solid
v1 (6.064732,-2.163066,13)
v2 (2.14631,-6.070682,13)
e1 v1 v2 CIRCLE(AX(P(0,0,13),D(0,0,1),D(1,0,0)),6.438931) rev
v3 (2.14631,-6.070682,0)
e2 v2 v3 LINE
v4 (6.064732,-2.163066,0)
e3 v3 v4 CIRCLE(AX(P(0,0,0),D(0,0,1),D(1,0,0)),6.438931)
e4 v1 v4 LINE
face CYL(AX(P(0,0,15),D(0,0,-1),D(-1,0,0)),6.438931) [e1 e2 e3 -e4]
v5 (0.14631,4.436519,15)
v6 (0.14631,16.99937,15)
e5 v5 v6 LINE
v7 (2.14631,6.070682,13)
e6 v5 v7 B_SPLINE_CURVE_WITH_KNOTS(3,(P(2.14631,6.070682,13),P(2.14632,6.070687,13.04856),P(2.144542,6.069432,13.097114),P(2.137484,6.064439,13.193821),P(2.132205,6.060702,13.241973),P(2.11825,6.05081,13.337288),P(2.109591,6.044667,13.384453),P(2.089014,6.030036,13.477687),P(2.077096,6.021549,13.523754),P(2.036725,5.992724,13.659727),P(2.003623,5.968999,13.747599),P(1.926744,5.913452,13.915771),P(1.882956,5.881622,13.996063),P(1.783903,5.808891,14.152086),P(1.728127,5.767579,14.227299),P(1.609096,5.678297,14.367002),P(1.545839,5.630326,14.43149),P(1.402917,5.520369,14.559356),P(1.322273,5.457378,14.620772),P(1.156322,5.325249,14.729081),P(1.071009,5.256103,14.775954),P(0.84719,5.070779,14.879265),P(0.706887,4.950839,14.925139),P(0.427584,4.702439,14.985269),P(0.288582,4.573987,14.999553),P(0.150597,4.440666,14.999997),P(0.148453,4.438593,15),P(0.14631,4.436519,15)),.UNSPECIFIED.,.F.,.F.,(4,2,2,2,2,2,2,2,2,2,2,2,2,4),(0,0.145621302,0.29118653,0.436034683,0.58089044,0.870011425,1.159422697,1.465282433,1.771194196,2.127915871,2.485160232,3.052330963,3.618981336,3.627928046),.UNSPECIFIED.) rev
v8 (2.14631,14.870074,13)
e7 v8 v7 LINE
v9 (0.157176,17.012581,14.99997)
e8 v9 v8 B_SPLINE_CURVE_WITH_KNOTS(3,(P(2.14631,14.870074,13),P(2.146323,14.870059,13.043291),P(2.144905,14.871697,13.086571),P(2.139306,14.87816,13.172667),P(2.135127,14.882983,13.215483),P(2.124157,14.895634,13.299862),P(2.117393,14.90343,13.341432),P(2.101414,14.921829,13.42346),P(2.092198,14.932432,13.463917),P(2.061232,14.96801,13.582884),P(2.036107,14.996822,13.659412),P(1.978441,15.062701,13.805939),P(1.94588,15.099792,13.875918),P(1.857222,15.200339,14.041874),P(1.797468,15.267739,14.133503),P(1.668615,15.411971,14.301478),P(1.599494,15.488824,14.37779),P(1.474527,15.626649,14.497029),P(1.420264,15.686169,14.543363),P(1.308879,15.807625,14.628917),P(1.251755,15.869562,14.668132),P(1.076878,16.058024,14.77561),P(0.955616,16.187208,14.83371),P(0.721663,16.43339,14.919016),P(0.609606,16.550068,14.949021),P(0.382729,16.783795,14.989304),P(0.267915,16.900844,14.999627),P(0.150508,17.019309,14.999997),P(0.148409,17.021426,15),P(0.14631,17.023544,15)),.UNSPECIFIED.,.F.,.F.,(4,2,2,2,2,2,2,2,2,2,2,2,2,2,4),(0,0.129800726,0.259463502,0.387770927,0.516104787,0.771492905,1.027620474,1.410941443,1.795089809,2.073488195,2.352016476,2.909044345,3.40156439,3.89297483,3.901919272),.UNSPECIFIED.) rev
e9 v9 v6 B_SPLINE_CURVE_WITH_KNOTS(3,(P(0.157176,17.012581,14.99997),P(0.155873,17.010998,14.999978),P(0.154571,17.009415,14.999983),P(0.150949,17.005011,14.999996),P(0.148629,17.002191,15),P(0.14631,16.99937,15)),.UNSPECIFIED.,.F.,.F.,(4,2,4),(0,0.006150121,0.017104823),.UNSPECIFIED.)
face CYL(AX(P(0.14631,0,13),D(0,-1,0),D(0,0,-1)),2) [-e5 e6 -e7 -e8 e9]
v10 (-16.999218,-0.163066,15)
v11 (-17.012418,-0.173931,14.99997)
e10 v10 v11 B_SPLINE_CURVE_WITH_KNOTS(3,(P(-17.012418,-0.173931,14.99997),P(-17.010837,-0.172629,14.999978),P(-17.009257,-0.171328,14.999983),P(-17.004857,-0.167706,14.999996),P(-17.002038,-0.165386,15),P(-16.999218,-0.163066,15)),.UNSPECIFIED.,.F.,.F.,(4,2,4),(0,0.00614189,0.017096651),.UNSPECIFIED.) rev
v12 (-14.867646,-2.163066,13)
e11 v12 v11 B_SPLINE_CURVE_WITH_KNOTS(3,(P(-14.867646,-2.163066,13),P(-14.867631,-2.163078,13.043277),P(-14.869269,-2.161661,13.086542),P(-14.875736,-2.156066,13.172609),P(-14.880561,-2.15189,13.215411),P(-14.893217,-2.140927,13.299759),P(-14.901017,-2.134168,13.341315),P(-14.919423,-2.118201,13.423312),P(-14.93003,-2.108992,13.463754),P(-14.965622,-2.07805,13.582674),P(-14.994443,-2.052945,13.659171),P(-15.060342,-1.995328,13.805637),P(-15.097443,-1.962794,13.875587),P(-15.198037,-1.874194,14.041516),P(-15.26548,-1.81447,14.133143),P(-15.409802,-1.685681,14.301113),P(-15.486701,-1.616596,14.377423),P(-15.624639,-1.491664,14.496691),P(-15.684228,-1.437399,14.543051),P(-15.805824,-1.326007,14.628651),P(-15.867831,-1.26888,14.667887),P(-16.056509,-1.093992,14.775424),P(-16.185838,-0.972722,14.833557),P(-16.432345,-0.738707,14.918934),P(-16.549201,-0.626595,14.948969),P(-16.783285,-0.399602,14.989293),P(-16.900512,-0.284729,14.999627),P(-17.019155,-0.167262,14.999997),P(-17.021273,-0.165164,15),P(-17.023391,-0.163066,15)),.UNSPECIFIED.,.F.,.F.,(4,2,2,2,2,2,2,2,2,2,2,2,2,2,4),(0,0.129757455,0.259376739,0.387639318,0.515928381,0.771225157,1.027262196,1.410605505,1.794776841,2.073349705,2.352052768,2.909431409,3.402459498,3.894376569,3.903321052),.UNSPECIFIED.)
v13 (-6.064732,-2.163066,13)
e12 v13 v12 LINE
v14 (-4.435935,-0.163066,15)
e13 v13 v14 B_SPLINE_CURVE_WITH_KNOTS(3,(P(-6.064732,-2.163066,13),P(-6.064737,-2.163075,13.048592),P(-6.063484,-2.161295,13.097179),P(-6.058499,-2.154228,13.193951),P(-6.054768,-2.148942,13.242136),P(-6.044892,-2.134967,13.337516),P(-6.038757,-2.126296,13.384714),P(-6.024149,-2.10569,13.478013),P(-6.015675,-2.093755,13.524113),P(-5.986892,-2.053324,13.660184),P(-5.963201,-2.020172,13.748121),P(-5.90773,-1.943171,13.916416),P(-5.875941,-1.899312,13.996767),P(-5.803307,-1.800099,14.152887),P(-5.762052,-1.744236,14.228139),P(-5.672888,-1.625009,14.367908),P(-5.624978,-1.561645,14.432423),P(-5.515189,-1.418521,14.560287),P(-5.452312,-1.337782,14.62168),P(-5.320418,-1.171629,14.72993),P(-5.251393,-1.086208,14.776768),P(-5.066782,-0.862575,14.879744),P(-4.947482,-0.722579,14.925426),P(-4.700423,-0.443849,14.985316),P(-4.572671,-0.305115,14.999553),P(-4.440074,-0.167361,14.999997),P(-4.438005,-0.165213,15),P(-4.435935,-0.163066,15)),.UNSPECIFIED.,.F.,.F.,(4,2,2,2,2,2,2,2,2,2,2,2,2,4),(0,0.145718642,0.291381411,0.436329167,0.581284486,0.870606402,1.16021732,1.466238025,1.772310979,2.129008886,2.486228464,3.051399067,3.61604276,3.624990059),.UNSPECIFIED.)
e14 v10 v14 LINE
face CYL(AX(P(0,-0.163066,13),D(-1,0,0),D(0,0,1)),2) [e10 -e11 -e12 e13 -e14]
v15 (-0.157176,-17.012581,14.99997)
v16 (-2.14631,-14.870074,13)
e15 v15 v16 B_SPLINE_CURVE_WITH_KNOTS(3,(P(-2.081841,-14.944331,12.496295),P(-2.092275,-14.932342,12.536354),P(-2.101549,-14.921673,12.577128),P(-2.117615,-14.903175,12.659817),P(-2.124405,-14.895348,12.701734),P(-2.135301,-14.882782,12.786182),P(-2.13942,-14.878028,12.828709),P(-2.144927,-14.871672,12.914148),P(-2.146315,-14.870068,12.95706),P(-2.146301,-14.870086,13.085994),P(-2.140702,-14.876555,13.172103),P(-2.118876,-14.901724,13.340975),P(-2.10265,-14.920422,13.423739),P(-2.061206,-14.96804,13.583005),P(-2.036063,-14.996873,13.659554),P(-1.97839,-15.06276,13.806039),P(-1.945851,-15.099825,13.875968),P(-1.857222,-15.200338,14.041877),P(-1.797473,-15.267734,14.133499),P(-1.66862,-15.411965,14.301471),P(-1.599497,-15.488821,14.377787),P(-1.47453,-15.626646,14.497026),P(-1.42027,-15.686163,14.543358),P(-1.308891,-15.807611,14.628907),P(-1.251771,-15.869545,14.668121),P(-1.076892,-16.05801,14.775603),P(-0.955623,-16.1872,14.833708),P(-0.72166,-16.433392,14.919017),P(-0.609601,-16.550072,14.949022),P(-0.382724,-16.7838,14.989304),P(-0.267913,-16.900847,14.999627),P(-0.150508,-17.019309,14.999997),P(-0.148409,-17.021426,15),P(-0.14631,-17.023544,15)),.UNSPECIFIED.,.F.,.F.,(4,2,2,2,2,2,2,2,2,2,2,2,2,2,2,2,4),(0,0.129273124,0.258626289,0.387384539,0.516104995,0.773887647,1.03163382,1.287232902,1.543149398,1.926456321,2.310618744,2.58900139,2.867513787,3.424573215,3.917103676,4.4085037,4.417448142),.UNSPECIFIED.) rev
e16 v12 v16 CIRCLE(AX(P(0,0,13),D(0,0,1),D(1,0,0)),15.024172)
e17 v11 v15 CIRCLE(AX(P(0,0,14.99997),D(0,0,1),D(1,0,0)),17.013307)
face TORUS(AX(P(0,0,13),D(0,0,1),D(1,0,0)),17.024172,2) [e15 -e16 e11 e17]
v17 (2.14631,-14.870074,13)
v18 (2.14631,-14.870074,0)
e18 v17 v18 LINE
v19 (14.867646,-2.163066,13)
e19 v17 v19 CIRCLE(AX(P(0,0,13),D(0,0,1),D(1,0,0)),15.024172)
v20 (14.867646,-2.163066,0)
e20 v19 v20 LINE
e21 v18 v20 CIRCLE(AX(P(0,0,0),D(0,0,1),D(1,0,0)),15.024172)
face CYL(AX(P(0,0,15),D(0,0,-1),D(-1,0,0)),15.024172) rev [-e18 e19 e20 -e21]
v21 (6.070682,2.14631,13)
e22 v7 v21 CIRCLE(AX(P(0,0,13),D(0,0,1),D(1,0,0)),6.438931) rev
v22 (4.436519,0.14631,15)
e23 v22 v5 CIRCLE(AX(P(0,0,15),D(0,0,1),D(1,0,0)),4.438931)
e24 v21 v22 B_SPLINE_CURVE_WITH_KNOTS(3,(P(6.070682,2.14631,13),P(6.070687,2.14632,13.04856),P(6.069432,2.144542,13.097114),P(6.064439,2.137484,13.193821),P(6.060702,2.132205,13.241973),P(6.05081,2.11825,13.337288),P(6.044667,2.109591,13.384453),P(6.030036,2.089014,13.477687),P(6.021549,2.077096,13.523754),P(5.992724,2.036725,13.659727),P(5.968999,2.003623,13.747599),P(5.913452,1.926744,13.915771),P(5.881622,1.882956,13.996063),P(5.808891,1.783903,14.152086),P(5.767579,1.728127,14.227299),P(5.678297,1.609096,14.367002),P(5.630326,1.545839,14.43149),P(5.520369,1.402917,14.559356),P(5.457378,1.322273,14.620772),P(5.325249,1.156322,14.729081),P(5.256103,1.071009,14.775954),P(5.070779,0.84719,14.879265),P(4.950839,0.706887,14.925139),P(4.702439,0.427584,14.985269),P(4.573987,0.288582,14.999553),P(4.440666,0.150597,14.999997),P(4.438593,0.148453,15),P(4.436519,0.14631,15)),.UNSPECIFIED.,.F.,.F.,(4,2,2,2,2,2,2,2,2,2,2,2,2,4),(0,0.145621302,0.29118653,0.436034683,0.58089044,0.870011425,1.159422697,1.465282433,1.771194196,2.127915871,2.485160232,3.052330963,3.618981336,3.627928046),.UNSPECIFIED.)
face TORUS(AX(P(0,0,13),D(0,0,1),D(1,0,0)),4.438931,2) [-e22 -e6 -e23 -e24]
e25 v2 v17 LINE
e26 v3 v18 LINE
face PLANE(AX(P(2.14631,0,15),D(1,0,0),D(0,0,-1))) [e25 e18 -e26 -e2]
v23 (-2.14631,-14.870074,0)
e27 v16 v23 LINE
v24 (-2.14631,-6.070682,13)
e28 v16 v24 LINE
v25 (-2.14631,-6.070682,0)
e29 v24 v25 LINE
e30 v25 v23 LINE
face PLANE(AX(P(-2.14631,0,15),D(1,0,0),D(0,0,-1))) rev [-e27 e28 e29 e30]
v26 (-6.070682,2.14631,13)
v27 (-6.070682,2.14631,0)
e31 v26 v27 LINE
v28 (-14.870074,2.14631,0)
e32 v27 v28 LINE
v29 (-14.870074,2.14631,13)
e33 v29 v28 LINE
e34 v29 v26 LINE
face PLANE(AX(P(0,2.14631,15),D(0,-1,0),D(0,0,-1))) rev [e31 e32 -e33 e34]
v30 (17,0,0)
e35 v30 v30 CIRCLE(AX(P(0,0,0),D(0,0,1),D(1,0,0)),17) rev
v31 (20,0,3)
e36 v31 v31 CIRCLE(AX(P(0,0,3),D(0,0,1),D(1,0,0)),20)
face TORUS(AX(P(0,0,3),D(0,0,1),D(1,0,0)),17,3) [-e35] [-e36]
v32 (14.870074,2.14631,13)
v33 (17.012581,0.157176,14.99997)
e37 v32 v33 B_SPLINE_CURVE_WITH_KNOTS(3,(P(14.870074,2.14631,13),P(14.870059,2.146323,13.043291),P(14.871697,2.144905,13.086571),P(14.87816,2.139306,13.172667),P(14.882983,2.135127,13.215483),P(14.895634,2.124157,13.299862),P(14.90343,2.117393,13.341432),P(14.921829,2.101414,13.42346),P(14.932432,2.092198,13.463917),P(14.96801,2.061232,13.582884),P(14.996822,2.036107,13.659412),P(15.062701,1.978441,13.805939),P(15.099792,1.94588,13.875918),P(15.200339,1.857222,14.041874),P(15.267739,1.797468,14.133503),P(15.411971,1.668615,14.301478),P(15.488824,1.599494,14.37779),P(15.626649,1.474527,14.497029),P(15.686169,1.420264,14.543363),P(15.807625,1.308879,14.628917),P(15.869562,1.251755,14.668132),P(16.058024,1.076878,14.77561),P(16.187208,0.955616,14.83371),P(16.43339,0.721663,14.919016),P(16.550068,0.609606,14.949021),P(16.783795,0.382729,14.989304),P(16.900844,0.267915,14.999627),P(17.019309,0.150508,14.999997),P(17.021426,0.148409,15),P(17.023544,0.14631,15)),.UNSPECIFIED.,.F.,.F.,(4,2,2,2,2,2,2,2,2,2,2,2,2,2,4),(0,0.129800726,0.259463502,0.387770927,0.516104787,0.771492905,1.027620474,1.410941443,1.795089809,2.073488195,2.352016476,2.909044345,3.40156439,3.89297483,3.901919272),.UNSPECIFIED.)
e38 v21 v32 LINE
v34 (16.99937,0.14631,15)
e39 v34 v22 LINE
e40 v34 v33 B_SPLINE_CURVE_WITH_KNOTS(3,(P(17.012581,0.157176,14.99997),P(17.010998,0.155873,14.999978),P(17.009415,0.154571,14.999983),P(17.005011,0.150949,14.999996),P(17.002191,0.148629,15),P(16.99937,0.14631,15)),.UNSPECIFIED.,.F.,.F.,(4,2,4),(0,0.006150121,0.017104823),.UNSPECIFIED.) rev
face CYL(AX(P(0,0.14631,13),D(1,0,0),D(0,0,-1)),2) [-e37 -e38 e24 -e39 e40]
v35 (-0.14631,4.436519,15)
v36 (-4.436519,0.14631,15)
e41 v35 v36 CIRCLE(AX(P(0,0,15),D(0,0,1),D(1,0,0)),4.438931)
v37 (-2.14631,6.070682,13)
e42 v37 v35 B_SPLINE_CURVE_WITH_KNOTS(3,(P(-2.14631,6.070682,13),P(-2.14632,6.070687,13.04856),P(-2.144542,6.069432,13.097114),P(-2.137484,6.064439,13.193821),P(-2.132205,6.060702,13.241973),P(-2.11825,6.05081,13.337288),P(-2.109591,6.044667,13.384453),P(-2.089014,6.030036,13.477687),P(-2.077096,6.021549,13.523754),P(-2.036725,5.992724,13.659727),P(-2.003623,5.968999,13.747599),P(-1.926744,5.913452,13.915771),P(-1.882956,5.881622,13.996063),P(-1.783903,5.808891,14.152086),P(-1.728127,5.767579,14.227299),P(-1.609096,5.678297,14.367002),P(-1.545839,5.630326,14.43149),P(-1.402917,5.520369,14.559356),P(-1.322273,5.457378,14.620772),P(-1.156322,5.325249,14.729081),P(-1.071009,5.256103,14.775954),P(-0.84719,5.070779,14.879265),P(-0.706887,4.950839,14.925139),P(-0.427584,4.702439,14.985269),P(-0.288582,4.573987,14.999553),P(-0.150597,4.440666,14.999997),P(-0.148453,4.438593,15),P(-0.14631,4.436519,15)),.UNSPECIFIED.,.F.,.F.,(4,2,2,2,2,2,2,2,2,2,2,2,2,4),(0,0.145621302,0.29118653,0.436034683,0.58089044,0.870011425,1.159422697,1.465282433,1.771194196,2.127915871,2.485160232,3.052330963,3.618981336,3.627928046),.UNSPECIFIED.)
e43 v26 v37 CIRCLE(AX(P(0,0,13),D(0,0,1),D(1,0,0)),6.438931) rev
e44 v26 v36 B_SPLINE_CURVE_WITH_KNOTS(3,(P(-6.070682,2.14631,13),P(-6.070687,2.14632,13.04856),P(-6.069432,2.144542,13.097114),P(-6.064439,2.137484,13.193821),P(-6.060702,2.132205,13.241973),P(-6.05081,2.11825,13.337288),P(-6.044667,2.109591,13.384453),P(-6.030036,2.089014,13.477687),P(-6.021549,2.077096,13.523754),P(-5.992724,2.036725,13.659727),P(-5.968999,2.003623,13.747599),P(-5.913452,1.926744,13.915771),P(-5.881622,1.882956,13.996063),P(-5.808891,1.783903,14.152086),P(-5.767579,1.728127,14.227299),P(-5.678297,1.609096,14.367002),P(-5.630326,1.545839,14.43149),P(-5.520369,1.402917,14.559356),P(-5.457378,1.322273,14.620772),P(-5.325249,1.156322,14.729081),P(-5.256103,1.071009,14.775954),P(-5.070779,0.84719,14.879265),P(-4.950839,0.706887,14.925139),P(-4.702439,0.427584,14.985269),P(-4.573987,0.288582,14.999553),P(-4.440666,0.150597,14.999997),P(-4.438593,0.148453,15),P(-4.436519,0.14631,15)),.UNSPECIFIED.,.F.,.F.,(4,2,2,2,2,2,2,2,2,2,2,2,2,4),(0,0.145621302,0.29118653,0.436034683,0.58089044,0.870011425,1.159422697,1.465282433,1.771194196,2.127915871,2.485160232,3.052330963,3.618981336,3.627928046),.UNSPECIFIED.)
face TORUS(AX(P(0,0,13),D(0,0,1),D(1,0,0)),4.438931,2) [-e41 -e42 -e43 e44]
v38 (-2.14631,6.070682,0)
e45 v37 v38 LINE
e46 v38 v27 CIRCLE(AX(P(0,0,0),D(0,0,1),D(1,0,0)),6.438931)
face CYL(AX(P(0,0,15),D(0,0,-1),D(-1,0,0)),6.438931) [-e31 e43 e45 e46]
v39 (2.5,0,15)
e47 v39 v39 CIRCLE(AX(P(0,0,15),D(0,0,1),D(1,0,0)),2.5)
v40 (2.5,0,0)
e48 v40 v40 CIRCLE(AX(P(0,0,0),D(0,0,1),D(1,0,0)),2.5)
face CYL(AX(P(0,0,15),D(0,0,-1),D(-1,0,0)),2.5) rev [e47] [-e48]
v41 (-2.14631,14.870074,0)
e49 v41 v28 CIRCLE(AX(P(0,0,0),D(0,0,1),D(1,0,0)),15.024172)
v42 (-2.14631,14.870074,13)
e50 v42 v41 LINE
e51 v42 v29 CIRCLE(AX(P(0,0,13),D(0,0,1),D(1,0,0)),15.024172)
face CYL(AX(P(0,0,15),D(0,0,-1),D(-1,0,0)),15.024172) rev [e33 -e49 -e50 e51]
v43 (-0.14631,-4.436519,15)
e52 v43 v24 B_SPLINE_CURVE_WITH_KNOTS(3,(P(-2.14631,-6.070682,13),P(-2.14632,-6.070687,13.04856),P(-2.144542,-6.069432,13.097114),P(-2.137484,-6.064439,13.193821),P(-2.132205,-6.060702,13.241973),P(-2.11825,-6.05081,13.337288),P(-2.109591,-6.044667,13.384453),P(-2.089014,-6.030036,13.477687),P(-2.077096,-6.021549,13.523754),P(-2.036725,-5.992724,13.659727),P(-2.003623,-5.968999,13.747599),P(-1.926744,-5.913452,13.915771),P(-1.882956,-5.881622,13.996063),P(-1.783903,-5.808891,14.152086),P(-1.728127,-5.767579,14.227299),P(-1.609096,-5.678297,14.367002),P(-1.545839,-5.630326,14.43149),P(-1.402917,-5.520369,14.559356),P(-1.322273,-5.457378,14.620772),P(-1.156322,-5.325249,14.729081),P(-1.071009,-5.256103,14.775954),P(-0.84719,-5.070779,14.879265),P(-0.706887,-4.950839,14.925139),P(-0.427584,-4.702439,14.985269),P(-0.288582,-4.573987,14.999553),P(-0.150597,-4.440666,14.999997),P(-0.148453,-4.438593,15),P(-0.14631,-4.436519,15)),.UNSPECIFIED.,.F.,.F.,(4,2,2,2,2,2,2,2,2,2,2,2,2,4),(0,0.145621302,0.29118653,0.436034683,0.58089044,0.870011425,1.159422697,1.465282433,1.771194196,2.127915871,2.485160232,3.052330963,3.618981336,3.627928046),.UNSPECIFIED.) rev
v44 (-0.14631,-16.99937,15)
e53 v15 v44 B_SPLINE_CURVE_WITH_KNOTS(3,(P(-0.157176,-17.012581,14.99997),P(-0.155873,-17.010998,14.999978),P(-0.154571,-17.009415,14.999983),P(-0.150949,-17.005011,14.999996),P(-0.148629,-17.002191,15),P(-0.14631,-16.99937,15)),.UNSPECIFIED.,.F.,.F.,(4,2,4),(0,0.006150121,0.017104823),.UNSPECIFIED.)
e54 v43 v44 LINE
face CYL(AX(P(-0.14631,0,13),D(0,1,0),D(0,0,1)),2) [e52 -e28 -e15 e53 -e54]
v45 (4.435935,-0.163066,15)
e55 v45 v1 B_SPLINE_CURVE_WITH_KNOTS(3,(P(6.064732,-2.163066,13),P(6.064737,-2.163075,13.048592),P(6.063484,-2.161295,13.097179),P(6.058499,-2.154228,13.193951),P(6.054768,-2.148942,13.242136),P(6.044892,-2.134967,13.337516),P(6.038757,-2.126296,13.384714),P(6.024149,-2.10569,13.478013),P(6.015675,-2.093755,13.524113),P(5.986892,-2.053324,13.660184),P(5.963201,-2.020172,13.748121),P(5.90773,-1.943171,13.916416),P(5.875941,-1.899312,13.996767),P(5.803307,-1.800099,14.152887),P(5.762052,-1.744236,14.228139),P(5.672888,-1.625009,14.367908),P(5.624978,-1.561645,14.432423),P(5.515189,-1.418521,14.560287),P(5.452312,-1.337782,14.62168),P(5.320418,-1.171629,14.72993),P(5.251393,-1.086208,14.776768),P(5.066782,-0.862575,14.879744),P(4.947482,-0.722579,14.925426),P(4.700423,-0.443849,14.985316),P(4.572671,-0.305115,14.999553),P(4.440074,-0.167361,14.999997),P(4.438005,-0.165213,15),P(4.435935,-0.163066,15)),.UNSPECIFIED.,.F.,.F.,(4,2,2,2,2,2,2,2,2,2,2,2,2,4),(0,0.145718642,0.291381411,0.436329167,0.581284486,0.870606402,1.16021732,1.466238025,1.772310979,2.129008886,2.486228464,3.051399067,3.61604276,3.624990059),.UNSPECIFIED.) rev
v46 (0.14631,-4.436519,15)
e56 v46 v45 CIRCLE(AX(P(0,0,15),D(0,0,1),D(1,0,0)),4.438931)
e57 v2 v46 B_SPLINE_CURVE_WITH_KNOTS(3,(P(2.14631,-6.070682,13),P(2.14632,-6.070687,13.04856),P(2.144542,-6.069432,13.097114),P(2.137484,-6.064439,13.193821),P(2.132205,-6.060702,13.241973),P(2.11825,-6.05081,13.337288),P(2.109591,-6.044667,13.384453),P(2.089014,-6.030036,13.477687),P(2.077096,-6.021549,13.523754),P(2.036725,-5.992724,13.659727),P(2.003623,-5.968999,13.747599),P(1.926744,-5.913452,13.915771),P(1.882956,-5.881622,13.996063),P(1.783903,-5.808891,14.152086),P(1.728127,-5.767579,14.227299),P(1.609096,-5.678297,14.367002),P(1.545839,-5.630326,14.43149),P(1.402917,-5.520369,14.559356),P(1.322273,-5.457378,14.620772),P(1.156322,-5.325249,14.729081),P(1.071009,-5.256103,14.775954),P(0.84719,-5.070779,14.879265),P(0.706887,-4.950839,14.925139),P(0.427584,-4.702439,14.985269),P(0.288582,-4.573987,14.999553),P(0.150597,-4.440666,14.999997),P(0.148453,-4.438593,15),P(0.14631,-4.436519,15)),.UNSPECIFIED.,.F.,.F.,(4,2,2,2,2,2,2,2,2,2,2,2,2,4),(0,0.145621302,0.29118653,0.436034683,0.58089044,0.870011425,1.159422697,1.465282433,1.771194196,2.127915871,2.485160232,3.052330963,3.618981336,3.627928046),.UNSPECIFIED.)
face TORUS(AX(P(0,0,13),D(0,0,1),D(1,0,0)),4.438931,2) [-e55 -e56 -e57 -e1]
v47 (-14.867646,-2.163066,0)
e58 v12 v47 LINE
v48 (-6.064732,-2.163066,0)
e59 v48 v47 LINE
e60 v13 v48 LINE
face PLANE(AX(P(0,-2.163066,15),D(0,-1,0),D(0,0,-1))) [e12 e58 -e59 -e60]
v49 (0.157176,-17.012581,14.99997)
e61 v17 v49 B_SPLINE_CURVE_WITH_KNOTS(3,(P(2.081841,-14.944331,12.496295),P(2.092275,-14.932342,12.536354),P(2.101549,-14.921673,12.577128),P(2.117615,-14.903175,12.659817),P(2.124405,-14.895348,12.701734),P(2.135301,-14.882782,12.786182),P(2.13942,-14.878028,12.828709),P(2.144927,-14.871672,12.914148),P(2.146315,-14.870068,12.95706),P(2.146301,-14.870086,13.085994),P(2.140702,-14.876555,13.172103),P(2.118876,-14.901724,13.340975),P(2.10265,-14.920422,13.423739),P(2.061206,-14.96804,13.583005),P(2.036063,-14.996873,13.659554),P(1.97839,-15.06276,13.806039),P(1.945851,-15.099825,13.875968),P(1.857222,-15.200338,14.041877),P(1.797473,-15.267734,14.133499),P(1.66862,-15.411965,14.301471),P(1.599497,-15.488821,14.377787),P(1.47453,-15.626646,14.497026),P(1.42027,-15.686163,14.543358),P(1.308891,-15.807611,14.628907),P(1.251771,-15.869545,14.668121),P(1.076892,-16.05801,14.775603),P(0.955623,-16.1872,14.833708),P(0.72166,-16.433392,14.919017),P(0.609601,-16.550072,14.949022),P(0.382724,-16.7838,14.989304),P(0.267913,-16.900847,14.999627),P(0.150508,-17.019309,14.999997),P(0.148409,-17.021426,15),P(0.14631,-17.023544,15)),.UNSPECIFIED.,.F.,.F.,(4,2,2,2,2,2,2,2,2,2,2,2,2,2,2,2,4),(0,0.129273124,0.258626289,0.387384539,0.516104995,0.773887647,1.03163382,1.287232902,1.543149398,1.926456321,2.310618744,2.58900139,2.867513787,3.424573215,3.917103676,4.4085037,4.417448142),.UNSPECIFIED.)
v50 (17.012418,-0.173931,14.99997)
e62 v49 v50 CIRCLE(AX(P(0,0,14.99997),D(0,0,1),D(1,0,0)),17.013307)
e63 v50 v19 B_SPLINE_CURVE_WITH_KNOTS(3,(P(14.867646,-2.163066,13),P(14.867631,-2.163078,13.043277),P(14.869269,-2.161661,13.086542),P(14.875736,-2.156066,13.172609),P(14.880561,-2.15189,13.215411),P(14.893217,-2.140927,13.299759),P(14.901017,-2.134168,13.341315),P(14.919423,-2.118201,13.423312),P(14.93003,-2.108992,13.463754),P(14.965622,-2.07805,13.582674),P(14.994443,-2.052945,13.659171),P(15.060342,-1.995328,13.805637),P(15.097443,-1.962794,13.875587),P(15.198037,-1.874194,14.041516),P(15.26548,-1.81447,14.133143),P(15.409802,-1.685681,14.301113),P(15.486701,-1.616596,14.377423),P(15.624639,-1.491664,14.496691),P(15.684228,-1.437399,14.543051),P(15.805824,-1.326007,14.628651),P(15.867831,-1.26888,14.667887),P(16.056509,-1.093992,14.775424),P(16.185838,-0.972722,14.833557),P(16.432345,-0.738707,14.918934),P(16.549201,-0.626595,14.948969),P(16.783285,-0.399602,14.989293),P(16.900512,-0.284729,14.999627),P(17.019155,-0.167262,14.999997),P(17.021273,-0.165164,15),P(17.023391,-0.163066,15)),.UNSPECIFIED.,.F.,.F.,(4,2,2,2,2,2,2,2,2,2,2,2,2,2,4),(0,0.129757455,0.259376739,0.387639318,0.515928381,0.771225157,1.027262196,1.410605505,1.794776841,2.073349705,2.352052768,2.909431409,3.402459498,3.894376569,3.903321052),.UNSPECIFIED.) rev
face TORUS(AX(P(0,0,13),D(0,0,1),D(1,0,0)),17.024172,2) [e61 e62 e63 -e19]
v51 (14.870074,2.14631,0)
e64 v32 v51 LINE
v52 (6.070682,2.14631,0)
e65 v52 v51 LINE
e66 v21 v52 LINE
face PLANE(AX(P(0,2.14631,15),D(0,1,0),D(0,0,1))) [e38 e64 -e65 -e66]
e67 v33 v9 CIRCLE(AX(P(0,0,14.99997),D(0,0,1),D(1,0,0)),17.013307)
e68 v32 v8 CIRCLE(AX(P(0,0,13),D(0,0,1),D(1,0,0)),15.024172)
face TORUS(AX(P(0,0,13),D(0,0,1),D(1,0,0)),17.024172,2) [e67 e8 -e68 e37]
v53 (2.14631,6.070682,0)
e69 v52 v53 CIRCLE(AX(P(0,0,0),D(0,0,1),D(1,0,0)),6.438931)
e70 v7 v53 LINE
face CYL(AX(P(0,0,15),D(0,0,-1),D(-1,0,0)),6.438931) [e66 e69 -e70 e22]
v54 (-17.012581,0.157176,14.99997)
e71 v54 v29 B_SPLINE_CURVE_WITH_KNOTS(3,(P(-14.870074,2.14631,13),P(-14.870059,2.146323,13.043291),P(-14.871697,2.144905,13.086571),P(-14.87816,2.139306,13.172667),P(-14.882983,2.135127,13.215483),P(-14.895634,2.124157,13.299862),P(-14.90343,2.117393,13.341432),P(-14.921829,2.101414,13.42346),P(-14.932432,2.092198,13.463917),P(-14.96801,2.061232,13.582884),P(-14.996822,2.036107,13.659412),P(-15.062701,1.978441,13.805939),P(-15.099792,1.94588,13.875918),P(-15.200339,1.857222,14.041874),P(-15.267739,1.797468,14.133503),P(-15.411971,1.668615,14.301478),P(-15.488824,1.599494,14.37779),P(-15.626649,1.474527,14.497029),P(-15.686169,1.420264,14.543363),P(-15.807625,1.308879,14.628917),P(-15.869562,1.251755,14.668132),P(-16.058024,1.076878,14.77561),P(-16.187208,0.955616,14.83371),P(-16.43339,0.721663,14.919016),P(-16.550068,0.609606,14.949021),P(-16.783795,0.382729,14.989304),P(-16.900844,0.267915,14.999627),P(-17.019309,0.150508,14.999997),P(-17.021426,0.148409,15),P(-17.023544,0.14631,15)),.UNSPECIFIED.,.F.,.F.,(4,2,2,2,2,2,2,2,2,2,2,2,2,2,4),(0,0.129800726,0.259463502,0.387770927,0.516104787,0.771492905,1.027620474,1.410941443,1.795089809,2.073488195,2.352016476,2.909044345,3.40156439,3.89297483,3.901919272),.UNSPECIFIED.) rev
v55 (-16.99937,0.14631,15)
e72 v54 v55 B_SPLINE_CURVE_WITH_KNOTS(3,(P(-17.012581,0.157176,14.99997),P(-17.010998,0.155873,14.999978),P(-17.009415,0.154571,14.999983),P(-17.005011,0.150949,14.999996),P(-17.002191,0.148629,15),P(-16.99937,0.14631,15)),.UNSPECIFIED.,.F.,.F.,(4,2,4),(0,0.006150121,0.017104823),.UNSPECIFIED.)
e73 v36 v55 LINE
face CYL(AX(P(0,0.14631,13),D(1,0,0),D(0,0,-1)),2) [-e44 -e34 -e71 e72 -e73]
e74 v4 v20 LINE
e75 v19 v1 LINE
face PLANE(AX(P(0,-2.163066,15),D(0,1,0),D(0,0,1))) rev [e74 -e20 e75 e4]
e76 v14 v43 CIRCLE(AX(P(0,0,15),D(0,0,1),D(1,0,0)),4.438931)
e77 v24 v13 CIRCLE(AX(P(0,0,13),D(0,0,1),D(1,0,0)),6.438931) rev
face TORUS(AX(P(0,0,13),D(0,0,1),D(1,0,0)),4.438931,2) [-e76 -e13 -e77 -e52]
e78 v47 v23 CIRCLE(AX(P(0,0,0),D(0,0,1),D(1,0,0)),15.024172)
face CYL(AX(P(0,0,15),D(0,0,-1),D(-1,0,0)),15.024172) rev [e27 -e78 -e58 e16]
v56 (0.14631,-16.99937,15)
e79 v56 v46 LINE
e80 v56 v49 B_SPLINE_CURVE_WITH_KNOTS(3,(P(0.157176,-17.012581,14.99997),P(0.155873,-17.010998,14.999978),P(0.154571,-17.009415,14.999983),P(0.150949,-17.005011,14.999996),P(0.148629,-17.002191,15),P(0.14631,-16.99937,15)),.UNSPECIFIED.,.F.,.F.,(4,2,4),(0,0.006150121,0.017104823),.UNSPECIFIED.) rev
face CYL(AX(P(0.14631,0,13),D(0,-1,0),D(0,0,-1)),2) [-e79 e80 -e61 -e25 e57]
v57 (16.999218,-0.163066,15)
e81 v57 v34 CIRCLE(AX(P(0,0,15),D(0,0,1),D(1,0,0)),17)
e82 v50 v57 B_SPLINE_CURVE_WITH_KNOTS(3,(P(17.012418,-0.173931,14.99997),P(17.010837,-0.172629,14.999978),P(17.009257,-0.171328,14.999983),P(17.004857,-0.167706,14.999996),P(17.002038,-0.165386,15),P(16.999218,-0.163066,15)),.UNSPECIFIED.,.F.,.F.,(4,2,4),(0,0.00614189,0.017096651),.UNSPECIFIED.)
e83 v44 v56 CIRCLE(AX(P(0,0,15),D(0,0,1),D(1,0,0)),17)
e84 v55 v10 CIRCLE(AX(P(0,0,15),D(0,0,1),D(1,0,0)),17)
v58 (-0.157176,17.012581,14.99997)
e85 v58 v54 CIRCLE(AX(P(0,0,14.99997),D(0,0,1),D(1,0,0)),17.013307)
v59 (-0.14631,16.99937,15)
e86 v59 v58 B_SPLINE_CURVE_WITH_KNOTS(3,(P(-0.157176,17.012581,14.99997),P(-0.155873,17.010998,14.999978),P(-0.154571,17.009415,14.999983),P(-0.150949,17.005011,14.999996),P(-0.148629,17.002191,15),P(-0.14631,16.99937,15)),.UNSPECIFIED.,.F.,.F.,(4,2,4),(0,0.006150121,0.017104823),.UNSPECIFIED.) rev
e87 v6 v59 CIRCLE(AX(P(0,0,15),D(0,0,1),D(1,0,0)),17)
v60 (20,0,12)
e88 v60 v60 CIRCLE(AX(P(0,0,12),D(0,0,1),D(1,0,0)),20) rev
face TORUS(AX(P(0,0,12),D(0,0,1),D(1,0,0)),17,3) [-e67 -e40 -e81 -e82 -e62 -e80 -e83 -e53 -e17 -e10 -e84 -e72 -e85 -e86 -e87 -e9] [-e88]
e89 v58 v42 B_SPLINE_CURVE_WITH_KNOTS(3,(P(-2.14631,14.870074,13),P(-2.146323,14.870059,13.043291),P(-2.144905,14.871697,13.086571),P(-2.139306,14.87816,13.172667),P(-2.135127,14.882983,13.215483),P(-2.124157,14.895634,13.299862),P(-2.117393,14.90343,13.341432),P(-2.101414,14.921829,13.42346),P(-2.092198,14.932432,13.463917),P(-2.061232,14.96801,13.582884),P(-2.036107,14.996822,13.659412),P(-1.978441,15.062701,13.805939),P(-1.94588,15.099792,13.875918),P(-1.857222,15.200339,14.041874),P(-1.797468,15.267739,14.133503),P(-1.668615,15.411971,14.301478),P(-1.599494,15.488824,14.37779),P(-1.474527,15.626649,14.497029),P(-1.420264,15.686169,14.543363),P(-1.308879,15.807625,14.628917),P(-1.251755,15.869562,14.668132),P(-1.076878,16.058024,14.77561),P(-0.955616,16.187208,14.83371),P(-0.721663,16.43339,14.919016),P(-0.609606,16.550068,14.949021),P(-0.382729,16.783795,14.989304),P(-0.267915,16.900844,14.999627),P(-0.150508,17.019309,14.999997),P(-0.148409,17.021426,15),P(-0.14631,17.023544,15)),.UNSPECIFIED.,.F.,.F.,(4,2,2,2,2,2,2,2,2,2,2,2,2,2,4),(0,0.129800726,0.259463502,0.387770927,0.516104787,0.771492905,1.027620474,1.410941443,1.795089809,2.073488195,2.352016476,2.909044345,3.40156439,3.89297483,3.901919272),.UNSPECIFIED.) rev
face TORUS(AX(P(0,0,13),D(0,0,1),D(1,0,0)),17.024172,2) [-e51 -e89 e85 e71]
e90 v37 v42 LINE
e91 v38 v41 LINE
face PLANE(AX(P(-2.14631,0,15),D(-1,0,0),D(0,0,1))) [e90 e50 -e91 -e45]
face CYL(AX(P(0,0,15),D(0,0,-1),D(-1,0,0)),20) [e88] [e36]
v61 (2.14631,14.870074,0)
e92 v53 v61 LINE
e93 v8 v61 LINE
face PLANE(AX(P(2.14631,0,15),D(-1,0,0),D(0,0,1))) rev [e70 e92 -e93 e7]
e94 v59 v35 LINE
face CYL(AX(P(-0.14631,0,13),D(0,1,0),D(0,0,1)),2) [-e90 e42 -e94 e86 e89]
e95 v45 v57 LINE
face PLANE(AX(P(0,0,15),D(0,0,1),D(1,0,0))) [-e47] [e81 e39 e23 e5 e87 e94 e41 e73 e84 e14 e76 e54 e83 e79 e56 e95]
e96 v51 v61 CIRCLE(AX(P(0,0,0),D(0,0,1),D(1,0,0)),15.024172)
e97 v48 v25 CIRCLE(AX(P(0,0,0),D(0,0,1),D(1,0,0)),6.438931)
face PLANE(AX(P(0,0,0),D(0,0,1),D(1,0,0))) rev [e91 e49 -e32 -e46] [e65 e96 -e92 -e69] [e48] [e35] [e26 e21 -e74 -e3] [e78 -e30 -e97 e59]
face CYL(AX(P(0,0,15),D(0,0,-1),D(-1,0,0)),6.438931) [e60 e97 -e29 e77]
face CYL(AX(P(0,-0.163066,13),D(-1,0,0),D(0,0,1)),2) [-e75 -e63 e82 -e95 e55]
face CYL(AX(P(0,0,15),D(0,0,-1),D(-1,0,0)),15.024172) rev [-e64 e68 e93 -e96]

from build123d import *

# Parameters (mm, degrees)
SKETCH2_R           = 20
SKETCH2_R_2         = 2.5
BOSS_EXTRUDE1_DEPTH = 15
SKETCH3_R           = 2.41667892
BOSS_EXTRUDE2_DEPTH = 15
FILLET2_R           = 2
FILLET3_R           = 3
SKETCH4_R           = 2.46809762
CUT_EXTRUDE1_DEPTH  = 7.5
CUT_EXTRUDE2_START  = -10
SKETCH5_R           = 2.5
CUT_EXTRUDE2_DEPTH  = 10


with BuildPart() as part:
    # Sketch2 → Boss-Extrude1 (new body)
    with BuildSketch(Plane.XY):
        Circle(SKETCH2_R)
        Circle(SKETCH2_R_2, mode=Mode.SUBTRACT)
        with BuildLine():
            Line((-2.146310324, 6.070682338), (-2.146310324, 14.870074118))
            ThreePointArc((-2.146310324, 14.870074118), (-10.623694091, 10.623694091), (-14.870074118, 2.146310324))
            Line((-14.870074118, 2.146310324), (-6.070682338, 2.146310324))
            ThreePointArc((-6.070682338, 2.146310324), (-4.553011753, 4.553011753), (-2.146310324, 6.070682338))
        make_face(mode=Mode.SUBTRACT)
        with BuildLine():
            Line((2.146310324, 6.070682338), (2.146310324, 14.870074118))
            ThreePointArc((2.146310324, 14.870074118), (10.623694091, 10.623694091), (14.870074118, 2.146310324))
            Line((14.870074118, 2.146310324), (6.070682338, 2.146310324))
            ThreePointArc((6.070682338, 2.146310324), (4.553011753, 4.553011753), (2.146310324, 6.070682338))
        make_face(mode=Mode.SUBTRACT)
        with BuildLine():
            Line((6.064732431, -2.163065556), (14.867646071, -2.163065556))
            ThreePointArc((14.867646071, -2.163065556), (10.617706659, -10.629678151), (2.146310324, -14.870074118))
            Line((2.146310324, -14.870074118), (2.146310324, -6.070682338))
            ThreePointArc((2.146310324, -6.070682338), (4.546721127, -4.5592937), (6.064732431, -2.163065556))
        make_face(mode=Mode.SUBTRACT)
        with BuildLine():
            Line((-2.146310324, -6.070682338), (-2.146310324, -14.870074118))
            ThreePointArc((-2.146310324, -14.870074118), (-10.617706659, -10.629678151), (-14.867646071, -2.163065556))
            Line((-14.867646071, -2.163065556), (-6.064732431, -2.163065556))
            ThreePointArc((-6.064732431, -2.163065556), (-4.546721127, -4.5592937), (-2.146310324, -6.070682338))
        make_face(mode=Mode.SUBTRACT)
    extrude(amount=BOSS_EXTRUDE1_DEPTH)

    # Fillet2
    fillet2_edges = [part.edges().sort_by_distance(p)[0] for p in [
        (10.470378228, 2.146310324, 15),
        (-10.470378228, 2.146310324, 15),
        (-10.623694091, 10.623694091, 15),
        (-2.146310324, 10.470378228, 15),
        (4.553011753, 4.553011753, 15),
        (2.146310324, 10.470378228, 15),
        (10.623694091, 10.623694091, 15),
        (2.146310324, -10.470378228, 15),
        (4.546721127, -4.5592937, 15),
        (10.466189251, -2.163065556, 15),
        (10.617706659, -10.629678151, 15),
        (-10.466189251, -2.163065556, 15),
        (-4.546721127, -4.5592937, 15),
        (-2.146310324, -10.470378228, 15),
        (-10.617706659, -10.629678151, 15),
        (-4.553011753, 4.553011753, 15),
    ]]
    fillet(fillet2_edges, radius=FILLET2_R)

    # Fillet3
    # the kernel refuses this fillet: 3 mm, written as the material it takes off along each edge
    with BuildSketch(Plane(origin=(0, 0, 15), x_dir=(1, 0, 0), z_dir=(0, -1, 0))) as fillet3_piece_1:
        with BuildLine():
            CenterArc((20 - FILLET3_R, -FILLET3_R), FILLET3_R, 0, 90)
            Line((20, -FILLET3_R), (20 + FILLET3_R * 0.02, -FILLET3_R))
            Line((20 + FILLET3_R * 0.02, -FILLET3_R), (20 + FILLET3_R * 0.02, FILLET3_R * 0.02))
            Line((20 + FILLET3_R * 0.02, FILLET3_R * 0.02), (20 - FILLET3_R, FILLET3_R * 0.02))
            Line((20 - FILLET3_R, FILLET3_R * 0.02), (20 - FILLET3_R, 0))
        make_face()
    revolve(axis=Axis((0, 0, 15), (0, 0, 1)), mode=Mode.SUBTRACT)
    with BuildSketch(Plane(origin=(0, 0, 0), x_dir=(1, 0, 0), z_dir=(0, -1, 0))) as fillet3_piece_2:
        with BuildLine():
            CenterArc((20 - FILLET3_R, FILLET3_R), FILLET3_R, 270, 90)
            Line((20, FILLET3_R), (20 + FILLET3_R * 0.02, FILLET3_R))
            Line((20 + FILLET3_R * 0.02, FILLET3_R), (20 + FILLET3_R * 0.02, -FILLET3_R * 0.02))
            Line((20 + FILLET3_R * 0.02, -FILLET3_R * 0.02), (20 - FILLET3_R, -FILLET3_R * 0.02))
            Line((20 - FILLET3_R, -FILLET3_R * 0.02), (20 - FILLET3_R, 0))
        make_face()
    revolve(axis=Axis((0, 0, 0), (0, 0, 1)), mode=Mode.SUBTRACT)


with BuildPart() as body_2:
    # Sketch3 → Boss-Extrude2 (new body)
    with BuildSketch(Plane.XY.offset(15)):
        Circle(SKETCH3_R)
    extrude(amount=-BOSS_EXTRUDE2_DEPTH)

    # Sketch4 → Cut-Extrude1 (cut)
    with BuildSketch(Plane.XY.offset(15)):
        Circle(SKETCH4_R)
    extrude(amount=-CUT_EXTRUDE1_DEPTH, mode=Mode.SUBTRACT)

    # Sketch5 → Cut-Extrude2 (cut)
    with BuildSketch(Plane.XY.offset(7.5).offset(CUT_EXTRUDE2_START)):
        Circle(SKETCH5_R)
    extrude(amount=CUT_EXTRUDE2_DEPTH, mode=Mode.SUBTRACT)


solid = part.part
